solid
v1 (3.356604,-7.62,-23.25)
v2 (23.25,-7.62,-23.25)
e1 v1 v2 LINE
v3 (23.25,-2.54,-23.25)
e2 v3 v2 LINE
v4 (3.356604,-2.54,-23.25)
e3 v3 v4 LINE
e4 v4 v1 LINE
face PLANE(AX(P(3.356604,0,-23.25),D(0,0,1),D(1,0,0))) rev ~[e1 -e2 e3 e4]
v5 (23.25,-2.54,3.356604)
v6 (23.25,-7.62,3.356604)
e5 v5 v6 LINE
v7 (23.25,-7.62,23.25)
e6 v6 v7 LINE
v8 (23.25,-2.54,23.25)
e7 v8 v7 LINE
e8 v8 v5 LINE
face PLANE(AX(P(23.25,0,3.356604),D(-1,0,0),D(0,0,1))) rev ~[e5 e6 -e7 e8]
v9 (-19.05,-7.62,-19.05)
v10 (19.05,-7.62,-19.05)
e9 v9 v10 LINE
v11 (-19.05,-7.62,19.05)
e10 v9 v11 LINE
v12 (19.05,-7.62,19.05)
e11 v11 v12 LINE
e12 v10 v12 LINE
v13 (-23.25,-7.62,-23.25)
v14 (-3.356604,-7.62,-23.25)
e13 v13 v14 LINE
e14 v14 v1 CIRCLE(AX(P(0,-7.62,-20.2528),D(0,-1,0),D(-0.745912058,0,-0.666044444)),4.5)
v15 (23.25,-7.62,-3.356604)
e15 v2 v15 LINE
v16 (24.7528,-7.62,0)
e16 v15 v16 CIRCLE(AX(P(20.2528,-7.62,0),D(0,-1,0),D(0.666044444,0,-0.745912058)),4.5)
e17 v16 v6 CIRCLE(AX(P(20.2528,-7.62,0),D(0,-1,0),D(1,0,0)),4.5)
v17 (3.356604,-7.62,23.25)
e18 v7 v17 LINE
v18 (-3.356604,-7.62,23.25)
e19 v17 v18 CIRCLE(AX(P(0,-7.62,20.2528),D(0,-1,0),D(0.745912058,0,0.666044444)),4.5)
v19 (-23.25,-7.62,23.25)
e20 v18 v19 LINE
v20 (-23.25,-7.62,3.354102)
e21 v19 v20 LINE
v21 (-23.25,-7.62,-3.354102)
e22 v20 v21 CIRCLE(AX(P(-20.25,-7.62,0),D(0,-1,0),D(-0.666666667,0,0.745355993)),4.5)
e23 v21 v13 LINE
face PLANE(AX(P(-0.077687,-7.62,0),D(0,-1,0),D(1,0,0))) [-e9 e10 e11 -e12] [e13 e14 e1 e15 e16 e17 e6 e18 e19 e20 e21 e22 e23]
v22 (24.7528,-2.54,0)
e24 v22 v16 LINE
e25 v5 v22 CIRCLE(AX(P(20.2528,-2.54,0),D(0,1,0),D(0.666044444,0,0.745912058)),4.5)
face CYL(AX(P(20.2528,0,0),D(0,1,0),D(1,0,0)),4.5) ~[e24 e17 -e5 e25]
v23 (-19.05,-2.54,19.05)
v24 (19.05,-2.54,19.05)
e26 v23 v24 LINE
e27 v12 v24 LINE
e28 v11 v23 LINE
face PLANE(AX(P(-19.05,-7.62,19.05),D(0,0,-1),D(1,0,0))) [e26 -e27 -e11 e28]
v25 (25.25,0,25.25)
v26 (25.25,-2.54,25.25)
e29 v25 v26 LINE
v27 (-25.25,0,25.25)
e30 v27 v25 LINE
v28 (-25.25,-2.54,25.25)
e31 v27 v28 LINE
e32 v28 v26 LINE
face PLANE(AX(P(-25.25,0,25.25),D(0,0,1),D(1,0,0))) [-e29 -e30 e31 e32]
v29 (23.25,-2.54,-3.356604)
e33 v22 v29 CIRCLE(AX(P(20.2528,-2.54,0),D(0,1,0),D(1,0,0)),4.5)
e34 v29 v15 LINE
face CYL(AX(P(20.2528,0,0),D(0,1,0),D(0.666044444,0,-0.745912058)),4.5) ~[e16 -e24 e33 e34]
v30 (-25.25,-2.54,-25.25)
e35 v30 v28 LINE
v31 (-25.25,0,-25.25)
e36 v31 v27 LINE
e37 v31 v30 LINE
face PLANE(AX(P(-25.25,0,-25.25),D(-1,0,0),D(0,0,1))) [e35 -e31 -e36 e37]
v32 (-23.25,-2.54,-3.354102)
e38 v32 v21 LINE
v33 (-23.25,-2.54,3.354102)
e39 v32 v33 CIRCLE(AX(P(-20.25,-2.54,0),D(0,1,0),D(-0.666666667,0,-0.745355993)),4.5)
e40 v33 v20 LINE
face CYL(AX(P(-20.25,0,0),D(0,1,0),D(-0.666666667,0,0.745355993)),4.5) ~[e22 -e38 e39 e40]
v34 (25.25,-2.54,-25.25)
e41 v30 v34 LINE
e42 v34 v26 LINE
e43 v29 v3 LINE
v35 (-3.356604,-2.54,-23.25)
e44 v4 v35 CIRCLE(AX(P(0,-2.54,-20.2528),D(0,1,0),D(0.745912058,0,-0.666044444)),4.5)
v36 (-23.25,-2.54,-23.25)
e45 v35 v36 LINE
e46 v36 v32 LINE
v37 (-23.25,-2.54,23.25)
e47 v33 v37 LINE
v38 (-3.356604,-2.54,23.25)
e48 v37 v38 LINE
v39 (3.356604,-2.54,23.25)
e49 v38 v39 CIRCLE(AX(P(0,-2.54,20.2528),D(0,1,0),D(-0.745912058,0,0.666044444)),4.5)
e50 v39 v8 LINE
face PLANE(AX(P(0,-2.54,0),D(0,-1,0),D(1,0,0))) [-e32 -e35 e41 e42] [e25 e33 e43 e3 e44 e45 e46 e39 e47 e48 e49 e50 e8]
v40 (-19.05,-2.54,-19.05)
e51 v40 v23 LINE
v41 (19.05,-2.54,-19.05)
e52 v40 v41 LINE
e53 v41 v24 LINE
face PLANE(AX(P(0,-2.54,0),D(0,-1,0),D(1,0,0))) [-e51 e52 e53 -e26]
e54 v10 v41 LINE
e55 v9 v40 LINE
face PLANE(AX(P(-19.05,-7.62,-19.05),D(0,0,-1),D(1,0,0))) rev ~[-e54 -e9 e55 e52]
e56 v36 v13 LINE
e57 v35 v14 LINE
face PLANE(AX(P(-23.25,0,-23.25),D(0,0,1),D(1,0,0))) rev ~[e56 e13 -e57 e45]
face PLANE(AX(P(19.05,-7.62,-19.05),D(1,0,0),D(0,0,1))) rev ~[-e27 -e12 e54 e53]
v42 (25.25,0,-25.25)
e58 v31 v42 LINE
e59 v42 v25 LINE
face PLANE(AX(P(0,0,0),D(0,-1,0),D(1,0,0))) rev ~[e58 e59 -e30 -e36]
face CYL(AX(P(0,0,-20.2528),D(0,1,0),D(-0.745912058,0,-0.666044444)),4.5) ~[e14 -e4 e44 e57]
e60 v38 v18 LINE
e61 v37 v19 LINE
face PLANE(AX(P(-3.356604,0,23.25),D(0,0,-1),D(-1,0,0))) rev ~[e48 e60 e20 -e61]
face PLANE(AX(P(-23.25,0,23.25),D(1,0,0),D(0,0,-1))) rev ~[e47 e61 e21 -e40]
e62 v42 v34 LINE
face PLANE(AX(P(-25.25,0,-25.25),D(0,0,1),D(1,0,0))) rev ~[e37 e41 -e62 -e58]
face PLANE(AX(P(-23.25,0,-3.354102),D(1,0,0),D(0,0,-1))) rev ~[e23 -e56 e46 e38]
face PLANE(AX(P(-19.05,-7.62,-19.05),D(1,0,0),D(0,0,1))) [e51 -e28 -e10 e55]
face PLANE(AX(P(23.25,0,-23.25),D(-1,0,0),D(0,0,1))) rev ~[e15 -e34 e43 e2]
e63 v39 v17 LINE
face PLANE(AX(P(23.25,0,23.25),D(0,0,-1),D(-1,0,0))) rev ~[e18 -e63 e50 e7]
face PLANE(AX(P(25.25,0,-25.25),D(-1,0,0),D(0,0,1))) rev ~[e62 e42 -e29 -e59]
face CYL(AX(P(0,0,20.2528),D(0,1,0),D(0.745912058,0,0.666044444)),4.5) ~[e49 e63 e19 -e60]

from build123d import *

# Parameters (mm, degrees)
F1_DEPTH = 7.62
F0_W     = 50.5
F0_H     = 50.5
F2_DEPTH = 2.54
F3_W     = 38.1
F3_H     = 38.1
F4_DEPTH = 5.08


# Not quite as in the source:
# - a feature names something its author has since deleted; it is built from what else it names


with BuildPart() as f1:
    # F0 (on Front) → F1 (new body)
    with BuildSketch(Plane.XZ):
        with BuildLine():
            Line((-3.3566042603, 23.25), (-23.25, 23.25))
            Line((-23.25, 23.25), (-23.25, 3.3541019662))
            ThreePointArc((-23.25, 3.3541019662), (-18.4128826929, 4.1079191813), (-15.75, 0))
            ThreePointArc((-15.75, 0), (-18.4128826929, -4.1079191813), (-23.25, -3.3541019662))
            Line((-23.25, -3.3541019662), (-23.25, -23.25))
            Line((-23.25, -23.25), (-3.3566042603, -23.25))
            ThreePointArc((-3.3566042603, -23.25), (-1.6039452654, -16.0483547827), (4.5, -20.2528))
            ThreePointArc((4.5, -20.2528), (4.2044452173, -21.8567452654), (3.3566042603, -23.25))
            Line((3.3566042603, -23.25), (23.25, -23.25))
            Line((23.25, -23.25), (23.25, -3.3566042603))
            ThreePointArc((23.25, -3.3566042603), (15.7528, 0), (23.25, 3.3566042603))
            Line((23.25, 3.3566042603), (23.25, 23.25))
            Line((23.25, 23.25), (3.3566042603, 23.25))
            ThreePointArc((3.3566042603, 23.25), (4.2044452173, 21.8567452654), (4.5, 20.2528))
            ThreePointArc((4.5, 20.2528), (-1.6039452654, 16.0483547827), (-3.3566042603, 23.25))
        make_face()
        with BuildLine():
            ThreePointArc((3.3566042603, 23.25), (0, 24.7528), (-3.3566042603, 23.25))
            Line((-3.3566042603, 23.25), (3.3566042603, 23.25))
        make_face()
        with BuildLine():
            Line((3.3566042603, 23.25), (-3.3566042603, 23.25))
            ThreePointArc((-3.3566042603, 23.25), (-1.6039452654, 16.0483547827), (4.5, 20.2528))
            ThreePointArc((4.5, 20.2528), (4.2044452173, 21.8567452654), (3.3566042603, 23.25))
        make_face()
        with BuildLine():
            ThreePointArc((-15.75, 0), (-18.4128826929, 4.1079191813), (-23.25, 3.3541019662))
            Line((-23.25, 3.3541019662), (-23.25, -3.3541019662))
            ThreePointArc((-23.25, -3.3541019662), (-18.4128826929, -4.1079191813), (-15.75, 0))
        make_face()
        with BuildLine():
            Line((-23.25, -3.3541019662), (-23.25, 3.3541019662))
            ThreePointArc((-23.25, 3.3541019662), (-24.75, 0), (-23.25, -3.3541019662))
        make_face()
        with BuildLine():
            ThreePointArc((4.5, -20.2528), (-1.6039452654, -16.0483547827), (-3.3566042603, -23.25))
            Line((-3.3566042603, -23.25), (3.3566042603, -23.25))
            ThreePointArc((3.3566042603, -23.25), (4.2044452173, -21.8567452654), (4.5, -20.2528))
        make_face()
        with BuildLine():
            Line((3.3566042603, -23.25), (-3.3566042603, -23.25))
            ThreePointArc((-3.3566042603, -23.25), (0, -24.7528), (3.3566042603, -23.25))
        make_face()
        with BuildLine():
            Line((23.25, -3.3566042603), (23.25, 3.3566042603))
            ThreePointArc((23.25, 3.3566042603), (15.7528, 0), (23.25, -3.3566042603))
        make_face()
        with BuildLine():
            ThreePointArc((24.7528, 0), (24.3599522981, 1.8388311505), (23.25, 3.3566042603))
            Line((23.25, 3.3566042603), (23.25, -3.3566042603))
            ThreePointArc((23.25, -3.3566042603), (24.3599522981, -1.8388311505), (24.7528, 0))
        make_face()
    extrude(amount=F1_DEPTH)

    # F0 (on Front) → F2 (join)
    with BuildSketch(Plane.XZ):
        Rectangle(F0_W, F0_H)
        with BuildLine():
            Line((-23.25, 3.3541019662), (-23.25, 23.25))
            Line((-23.25, 23.25), (-3.3566042603, 23.25))
            ThreePointArc((-3.3566042603, 23.25), (0, 24.7528), (3.3566042603, 23.25))
            Line((3.3566042603, 23.25), (23.25, 23.25))
            Line((23.25, 23.25), (23.25, 3.3566042603))
            ThreePointArc((23.25, 3.3566042603), (24.3599522981, 1.8388311505), (24.7528, 0))
            ThreePointArc((24.7528, 0), (24.3599522981, -1.8388311505), (23.25, -3.3566042603))
            Line((23.25, -3.3566042603), (23.25, -23.25))
            Line((23.25, -23.25), (3.3566042603, -23.25))
            ThreePointArc((3.3566042603, -23.25), (0, -24.7528), (-3.3566042603, -23.25))
            Line((-3.3566042603, -23.25), (-23.25, -23.25))
            Line((-23.25, -23.25), (-23.25, -3.3541019662))
            ThreePointArc((-23.25, -3.3541019662), (-24.75, 0), (-23.25, 3.3541019662))
        make_face(mode=Mode.SUBTRACT)
    extrude(amount=F2_DEPTH)

    # F3 (on face) → F4 (cut)
    with BuildSketch(Plane.XZ.offset(7.62)):
        Rectangle(F3_W, F3_H)
    extrude(amount=-F4_DEPTH, mode=Mode.SUBTRACT)


solid = f1.part
